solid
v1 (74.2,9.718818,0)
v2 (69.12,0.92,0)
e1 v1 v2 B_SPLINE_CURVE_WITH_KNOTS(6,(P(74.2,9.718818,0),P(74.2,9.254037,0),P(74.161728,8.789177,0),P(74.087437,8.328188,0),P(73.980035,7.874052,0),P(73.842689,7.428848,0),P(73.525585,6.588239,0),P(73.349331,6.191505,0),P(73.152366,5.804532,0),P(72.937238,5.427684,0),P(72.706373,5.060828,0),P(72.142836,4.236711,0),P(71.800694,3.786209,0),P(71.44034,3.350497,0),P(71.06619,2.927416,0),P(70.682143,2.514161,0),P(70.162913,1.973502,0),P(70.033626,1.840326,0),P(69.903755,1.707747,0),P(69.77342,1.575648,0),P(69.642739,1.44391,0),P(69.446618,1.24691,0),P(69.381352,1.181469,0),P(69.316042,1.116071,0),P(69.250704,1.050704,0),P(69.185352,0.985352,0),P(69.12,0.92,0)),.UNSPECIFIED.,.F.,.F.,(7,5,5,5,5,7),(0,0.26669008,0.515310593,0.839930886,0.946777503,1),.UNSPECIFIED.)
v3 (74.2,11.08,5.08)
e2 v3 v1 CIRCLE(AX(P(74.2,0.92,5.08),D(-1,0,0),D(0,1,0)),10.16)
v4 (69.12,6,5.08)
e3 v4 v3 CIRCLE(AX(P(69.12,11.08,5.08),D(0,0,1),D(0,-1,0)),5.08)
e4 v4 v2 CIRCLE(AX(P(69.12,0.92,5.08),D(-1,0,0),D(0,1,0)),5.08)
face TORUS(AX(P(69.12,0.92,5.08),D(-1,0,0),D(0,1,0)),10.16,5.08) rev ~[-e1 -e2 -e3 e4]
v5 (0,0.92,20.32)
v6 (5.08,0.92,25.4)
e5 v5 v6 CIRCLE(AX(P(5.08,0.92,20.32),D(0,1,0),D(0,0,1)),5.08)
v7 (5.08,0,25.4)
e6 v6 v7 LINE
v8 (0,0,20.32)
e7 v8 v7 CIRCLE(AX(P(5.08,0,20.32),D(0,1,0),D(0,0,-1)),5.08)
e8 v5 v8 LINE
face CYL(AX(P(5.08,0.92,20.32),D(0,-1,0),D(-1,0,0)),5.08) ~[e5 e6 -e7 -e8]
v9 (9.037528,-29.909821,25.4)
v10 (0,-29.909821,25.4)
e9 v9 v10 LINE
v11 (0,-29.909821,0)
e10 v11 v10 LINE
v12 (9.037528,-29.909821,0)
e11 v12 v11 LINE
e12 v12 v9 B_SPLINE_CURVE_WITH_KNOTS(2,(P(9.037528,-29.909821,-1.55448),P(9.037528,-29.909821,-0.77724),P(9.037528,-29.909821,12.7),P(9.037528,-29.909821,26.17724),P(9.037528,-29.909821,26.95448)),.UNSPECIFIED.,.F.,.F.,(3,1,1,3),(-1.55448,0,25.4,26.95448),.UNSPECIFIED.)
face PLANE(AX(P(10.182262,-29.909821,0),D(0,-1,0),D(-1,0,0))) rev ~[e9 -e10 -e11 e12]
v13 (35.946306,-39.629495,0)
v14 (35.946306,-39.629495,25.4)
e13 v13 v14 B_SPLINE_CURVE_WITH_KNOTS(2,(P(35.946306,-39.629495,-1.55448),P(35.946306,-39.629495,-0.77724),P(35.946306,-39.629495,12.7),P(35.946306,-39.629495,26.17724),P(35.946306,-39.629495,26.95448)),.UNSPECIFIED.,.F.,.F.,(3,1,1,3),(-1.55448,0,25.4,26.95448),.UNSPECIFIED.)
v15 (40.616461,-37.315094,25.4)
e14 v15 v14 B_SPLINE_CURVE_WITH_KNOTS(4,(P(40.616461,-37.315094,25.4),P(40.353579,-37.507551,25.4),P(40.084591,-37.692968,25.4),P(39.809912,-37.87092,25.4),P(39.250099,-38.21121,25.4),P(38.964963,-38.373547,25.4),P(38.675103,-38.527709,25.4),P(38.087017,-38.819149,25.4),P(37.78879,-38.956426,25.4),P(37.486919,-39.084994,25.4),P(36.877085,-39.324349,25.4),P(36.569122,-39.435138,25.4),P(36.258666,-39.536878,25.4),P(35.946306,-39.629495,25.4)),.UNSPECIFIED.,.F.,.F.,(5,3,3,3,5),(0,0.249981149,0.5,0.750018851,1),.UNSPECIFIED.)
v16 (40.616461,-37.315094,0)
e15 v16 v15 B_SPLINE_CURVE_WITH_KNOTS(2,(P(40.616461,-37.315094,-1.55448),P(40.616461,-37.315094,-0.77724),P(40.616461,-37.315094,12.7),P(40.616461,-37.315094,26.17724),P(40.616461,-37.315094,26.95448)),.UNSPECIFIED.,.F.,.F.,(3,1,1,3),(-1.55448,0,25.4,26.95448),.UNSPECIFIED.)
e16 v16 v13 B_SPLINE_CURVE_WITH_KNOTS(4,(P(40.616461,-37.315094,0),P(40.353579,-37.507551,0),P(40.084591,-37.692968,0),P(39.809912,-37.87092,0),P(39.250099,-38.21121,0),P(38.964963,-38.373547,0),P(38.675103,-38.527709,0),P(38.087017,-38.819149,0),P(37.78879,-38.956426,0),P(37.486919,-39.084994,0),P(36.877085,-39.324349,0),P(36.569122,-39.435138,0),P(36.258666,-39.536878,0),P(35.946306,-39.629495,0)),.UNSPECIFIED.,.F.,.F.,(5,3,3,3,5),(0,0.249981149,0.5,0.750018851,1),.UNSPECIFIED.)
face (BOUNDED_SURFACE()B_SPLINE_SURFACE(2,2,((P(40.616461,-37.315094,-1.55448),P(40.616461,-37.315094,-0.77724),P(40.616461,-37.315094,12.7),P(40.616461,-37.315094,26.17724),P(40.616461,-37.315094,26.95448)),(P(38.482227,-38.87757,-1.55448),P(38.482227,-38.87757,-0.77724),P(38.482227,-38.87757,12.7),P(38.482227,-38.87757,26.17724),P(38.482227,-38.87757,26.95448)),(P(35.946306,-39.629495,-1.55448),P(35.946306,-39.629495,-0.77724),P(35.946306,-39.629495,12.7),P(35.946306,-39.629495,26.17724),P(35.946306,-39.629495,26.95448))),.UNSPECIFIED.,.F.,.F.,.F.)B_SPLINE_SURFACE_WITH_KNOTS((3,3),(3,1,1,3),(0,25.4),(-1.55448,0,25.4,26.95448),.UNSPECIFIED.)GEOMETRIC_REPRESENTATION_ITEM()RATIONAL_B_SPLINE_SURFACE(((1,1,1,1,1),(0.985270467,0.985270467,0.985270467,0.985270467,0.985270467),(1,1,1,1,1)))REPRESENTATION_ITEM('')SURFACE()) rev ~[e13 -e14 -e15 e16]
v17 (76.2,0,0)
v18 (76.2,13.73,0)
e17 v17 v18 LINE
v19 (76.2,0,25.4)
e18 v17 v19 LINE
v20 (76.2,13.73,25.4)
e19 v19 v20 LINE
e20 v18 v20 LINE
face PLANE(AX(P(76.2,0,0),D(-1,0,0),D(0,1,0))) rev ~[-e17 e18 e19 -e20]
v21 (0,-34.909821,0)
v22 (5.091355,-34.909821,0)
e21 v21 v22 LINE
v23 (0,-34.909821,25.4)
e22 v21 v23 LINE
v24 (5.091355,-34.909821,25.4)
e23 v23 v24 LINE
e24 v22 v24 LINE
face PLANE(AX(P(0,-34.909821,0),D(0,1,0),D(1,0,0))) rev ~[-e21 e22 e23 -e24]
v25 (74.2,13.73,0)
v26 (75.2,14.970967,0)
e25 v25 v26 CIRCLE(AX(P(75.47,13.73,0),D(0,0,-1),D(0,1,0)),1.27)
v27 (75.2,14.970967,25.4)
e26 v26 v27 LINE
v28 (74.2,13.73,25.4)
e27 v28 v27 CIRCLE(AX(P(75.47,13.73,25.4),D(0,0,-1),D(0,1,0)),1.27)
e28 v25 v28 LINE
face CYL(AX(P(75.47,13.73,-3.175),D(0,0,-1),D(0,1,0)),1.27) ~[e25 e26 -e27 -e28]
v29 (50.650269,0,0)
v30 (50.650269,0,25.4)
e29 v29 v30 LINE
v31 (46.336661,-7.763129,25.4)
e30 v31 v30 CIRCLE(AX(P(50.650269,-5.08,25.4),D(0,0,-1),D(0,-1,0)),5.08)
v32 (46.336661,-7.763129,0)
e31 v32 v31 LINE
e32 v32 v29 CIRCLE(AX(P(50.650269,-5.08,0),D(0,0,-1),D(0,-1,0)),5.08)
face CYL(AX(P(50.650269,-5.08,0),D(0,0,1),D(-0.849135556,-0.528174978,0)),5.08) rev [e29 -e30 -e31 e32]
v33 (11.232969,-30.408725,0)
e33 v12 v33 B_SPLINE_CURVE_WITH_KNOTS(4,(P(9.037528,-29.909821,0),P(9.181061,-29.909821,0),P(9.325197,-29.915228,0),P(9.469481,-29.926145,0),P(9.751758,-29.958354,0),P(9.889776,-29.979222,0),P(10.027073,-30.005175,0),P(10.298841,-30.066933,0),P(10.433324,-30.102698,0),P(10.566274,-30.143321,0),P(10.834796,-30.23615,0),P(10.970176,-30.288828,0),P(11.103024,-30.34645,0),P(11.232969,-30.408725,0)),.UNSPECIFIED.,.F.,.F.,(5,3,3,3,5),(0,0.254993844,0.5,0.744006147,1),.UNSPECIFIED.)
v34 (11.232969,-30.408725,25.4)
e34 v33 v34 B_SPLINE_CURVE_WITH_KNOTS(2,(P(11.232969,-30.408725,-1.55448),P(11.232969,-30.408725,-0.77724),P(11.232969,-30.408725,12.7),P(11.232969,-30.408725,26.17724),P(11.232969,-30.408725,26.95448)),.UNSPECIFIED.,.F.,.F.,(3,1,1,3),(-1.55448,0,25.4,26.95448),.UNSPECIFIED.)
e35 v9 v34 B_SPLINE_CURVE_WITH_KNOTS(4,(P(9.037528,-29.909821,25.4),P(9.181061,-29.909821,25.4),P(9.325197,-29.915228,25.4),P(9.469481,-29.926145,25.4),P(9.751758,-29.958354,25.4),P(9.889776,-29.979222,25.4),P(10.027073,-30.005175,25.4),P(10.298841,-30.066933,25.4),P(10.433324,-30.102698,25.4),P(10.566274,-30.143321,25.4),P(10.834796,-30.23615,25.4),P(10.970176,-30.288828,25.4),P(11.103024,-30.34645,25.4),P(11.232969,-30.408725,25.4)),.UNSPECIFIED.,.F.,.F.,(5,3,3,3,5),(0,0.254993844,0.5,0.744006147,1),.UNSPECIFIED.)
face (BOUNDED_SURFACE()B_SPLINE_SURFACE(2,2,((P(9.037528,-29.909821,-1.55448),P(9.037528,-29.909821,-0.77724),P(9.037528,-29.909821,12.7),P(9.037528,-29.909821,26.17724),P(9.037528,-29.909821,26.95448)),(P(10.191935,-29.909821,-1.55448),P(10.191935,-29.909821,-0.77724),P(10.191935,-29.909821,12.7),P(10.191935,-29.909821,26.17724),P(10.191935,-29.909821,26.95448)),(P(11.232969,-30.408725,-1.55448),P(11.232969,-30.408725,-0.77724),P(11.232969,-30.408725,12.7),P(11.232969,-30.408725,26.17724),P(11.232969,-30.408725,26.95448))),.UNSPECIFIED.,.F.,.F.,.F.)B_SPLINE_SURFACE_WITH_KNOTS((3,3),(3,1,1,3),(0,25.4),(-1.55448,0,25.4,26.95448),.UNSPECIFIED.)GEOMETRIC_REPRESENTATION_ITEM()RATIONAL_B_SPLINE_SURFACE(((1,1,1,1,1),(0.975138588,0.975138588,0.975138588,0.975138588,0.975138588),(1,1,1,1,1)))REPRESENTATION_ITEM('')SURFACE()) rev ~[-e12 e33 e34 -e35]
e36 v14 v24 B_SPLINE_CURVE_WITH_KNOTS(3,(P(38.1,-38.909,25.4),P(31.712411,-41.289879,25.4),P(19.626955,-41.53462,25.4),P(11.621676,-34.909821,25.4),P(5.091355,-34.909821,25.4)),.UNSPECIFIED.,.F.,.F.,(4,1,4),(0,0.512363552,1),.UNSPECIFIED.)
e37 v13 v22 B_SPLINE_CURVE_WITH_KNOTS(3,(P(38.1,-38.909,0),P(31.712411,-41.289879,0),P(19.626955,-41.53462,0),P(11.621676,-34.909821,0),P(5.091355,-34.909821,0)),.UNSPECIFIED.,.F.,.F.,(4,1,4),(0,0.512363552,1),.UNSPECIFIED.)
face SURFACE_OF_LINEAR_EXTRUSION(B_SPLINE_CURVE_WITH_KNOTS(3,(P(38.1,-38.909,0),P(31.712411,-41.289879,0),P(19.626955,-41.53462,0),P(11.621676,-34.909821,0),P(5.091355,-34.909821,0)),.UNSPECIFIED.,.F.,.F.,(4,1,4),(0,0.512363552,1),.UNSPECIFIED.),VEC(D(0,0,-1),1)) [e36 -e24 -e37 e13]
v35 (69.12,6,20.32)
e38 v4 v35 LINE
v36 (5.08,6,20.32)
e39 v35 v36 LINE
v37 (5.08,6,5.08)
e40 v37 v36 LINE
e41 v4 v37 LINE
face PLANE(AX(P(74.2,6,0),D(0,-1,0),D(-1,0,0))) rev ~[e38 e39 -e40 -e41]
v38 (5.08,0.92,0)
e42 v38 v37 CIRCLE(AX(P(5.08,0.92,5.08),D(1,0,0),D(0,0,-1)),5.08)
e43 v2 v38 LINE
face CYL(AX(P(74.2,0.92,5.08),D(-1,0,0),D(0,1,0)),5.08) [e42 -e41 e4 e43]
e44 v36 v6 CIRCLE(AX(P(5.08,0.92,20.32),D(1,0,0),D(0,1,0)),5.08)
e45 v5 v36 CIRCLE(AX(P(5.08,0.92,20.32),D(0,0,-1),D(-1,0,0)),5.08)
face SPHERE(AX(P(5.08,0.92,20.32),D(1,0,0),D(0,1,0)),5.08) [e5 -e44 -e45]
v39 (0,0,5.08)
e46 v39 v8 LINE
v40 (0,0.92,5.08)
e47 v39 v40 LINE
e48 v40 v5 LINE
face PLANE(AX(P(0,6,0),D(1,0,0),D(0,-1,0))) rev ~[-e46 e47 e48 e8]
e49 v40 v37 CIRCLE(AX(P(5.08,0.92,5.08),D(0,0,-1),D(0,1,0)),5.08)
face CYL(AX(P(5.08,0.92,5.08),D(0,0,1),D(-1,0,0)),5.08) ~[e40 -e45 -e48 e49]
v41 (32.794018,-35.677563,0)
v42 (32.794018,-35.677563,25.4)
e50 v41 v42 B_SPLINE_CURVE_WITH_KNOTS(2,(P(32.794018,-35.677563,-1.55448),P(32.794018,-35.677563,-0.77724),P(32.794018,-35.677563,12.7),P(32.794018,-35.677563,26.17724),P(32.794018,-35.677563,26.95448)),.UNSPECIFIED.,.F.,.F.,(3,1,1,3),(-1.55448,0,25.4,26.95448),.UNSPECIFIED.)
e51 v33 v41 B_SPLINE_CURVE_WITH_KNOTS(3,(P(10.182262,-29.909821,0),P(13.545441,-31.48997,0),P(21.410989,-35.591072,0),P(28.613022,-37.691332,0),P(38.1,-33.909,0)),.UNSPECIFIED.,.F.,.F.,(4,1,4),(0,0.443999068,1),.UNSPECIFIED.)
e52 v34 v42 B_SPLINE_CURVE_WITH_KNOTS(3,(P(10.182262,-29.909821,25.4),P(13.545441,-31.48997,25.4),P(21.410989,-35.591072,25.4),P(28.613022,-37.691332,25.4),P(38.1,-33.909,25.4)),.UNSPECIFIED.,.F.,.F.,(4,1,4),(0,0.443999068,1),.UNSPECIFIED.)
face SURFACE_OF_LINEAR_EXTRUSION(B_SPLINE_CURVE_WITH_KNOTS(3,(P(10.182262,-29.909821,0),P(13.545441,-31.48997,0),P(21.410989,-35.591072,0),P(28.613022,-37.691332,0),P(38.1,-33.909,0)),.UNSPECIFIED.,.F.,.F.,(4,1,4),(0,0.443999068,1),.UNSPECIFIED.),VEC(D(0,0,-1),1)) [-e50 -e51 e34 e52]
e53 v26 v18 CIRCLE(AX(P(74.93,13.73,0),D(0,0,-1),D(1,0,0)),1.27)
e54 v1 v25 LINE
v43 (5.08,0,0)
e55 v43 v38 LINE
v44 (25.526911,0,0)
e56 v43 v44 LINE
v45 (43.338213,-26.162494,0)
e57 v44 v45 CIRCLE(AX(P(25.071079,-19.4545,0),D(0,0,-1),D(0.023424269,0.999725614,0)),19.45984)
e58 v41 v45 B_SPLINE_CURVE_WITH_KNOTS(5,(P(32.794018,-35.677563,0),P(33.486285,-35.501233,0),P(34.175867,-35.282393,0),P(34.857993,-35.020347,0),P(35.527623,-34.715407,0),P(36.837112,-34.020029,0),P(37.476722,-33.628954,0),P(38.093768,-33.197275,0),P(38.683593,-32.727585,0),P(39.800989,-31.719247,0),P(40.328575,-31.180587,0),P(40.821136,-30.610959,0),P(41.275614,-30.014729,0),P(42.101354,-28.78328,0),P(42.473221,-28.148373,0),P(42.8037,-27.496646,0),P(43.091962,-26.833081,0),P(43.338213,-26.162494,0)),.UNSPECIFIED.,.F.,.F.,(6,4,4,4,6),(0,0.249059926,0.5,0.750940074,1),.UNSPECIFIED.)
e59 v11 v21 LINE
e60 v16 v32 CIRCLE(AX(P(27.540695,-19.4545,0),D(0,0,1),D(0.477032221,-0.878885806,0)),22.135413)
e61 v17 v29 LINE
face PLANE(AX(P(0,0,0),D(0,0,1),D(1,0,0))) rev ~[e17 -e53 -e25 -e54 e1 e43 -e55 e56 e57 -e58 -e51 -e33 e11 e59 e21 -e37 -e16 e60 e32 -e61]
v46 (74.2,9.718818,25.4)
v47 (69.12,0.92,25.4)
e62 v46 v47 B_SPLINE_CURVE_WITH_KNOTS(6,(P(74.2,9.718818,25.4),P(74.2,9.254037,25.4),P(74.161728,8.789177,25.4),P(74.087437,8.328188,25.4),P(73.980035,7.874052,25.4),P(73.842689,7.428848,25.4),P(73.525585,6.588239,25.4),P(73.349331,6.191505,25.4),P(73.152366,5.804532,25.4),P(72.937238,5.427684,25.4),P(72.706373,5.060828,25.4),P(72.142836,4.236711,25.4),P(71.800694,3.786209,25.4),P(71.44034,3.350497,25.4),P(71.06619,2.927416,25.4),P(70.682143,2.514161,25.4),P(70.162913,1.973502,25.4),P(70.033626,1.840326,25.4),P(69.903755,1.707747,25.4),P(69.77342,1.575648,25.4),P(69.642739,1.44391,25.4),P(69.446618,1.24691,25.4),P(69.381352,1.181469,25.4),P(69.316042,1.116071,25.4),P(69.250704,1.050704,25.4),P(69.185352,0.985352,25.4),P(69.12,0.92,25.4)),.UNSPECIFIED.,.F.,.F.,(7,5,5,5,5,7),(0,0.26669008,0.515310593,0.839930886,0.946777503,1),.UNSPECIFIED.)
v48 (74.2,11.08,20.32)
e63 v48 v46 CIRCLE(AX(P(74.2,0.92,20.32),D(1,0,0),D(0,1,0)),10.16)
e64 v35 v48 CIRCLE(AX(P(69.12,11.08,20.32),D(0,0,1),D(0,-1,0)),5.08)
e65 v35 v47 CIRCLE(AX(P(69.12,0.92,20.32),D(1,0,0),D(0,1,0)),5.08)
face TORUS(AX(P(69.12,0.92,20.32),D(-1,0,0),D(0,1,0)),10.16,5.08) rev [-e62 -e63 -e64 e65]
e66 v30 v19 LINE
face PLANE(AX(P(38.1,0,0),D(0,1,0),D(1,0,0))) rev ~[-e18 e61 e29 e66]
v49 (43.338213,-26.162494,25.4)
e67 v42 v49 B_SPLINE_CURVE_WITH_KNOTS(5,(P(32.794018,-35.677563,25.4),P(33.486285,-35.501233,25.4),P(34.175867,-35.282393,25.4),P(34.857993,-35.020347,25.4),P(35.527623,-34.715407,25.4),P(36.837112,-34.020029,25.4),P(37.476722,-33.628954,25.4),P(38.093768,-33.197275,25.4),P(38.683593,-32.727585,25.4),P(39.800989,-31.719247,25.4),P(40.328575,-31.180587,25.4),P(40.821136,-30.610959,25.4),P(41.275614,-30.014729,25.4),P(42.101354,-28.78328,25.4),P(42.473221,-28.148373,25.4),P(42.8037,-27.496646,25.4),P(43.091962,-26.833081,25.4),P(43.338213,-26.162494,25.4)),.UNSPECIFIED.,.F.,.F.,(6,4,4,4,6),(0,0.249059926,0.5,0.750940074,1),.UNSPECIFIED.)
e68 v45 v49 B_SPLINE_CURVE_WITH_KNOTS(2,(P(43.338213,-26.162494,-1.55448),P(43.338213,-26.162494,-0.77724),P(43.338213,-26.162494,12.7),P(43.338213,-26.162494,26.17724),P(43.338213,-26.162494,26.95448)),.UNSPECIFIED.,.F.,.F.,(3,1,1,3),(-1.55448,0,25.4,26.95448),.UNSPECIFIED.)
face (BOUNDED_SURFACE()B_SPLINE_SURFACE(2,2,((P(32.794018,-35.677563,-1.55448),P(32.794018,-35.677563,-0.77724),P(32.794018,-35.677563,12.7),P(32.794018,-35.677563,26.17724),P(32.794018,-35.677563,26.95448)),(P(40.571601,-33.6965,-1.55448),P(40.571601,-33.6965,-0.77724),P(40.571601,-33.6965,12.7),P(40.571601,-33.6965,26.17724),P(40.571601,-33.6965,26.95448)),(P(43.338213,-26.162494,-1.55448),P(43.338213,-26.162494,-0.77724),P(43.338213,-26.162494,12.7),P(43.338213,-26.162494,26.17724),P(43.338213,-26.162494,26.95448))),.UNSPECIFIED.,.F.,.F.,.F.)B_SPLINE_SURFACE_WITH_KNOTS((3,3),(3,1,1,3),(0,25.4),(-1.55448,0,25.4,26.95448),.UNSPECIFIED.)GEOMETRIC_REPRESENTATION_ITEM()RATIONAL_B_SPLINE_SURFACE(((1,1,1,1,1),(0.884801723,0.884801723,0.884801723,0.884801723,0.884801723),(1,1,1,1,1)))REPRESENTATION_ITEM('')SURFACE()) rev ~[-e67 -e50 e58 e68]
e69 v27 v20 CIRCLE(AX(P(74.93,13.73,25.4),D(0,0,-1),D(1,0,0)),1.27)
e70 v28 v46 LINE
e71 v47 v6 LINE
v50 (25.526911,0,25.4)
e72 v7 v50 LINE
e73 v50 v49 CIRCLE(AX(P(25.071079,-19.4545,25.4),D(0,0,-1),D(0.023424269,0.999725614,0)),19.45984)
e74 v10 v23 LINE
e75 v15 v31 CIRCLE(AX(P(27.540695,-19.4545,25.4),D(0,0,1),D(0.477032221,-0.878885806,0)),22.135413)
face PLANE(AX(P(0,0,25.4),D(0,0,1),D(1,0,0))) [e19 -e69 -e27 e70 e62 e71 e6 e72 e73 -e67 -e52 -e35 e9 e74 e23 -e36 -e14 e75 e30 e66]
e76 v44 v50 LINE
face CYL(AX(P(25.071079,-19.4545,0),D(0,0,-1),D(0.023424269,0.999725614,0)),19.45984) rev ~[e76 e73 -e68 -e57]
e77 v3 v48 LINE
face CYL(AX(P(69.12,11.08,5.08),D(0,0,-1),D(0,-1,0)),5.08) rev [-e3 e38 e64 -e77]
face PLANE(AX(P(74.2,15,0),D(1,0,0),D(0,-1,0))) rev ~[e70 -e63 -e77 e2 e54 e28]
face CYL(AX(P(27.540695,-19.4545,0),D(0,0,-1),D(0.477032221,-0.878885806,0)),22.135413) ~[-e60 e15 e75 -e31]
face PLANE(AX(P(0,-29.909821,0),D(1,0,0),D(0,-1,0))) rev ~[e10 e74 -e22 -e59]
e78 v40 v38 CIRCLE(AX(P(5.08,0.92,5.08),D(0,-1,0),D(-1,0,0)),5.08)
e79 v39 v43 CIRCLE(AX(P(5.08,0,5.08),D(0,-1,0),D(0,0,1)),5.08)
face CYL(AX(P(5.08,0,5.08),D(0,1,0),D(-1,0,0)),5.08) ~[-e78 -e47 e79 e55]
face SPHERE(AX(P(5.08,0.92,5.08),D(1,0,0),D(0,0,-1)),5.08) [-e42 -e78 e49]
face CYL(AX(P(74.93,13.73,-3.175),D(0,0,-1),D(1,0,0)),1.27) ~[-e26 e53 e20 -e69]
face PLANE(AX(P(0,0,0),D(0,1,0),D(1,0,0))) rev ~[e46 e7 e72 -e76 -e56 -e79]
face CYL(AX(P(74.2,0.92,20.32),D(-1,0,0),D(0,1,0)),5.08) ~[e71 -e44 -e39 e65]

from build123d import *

# Parameters (mm, degrees)
F1_DEPTH     = 25.4
F2_R         = 5.08
F3_T1_DEPTH  = 15.24
F3_T6_ANGLE  = 233.2969892374
F3_T12_ANGLE = 233.2969892374
F4_T1_DEPTH  = 31.75
F5_R         = 15.24
F6_R         = 5.08
F7_R         = 5.08
F8_R         = 5.08


# Not quite as in the source:
# - a fillet or chamfer that OpenCascade refuses, or shapes differently, is made with other operations: its cross-section is extruded or revolved along the edge and cut away or added


with BuildPart() as f1:
    # F0 (on Top) → F1 (new body)
    with BuildSketch(Plane.XY):
        Polygon((0, 6), (0, 0), (25.5269114748, 0), (38.1, 0), (76.2, 0), (76.2, 15), (74.2, 15), (74.2, 6), align=None)
        with BuildLine():
            Line((38.1, 0), (25.5269114748, 0))
            ThreePointArc((25.5269114748, 0), (43.3170296074, -12.6890998813), (38.1, -33.909))
            add(Edge.make_bspline(
                [(10.1822623983, -29.9098208), (13.5454405981, -31.48996992), (21.4109886211, -35.5910719416), (28.6130215973, -37.6913323998), (38.1, -33.909)],
                knots=[0, 0, 0, 0, 0.4439990675, 1, 1, 1, 1], degree=3))
            Line((10.1822623983, -29.9098208), (0, -29.9098208))
            Line((0, -29.9098208), (0, -34.9098208))
            Line((0, -34.9098208), (5.0913545239, -34.9098208))
            add(Edge.make_bspline(
                [(38.1, -38.909), (31.7124112149, -41.2898788749), (19.626955474, -41.5346198852), (11.6216761715, -34.9098208), (5.0913545239, -34.9098208)],
                knots=[0, 0, 0, 0, 0.512363552, 1, 1, 1, 1], degree=3))
            ThreePointArc((38.1, -38.909), (49.6761075901, -19.4545), (38.1, 0))
        make_face()
    extrude(amount=F1_DEPTH)

    # F2
    f2_edges = [f1.edges().sort_by_distance(p)[0] for p in [
        (37.1, 6, 25.4),
        (37.1, 6, 0),
    ]]
    fillet(f2_edges, radius=F2_R)

    # F3: fillet of radius 5.08 on 1 edges, made by hand

    # F3_s2 → F3_t1 (join)
    with BuildSketch(Plane.XY.offset(5.08)):
        with BuildLine():
            ThreePointArc((69.12, 6), (72.7121024484, 7.4878975516), (74.2, 11.08))
            Line((74.2, 11.08), (74.2, 6))
            Line((74.2, 6), (69.12, 6))
        make_face()
    extrude(amount=F3_T1_DEPTH)


with BuildPart() as f3_tool4:
    # F3_s5 → F3_t6 (revolve)
    with BuildSketch(Plane.XY.offset(5.08)):
        with BuildLine():
            ThreePointArc((69.12, 6), (72.7121024484, 7.4878975516), (74.2, 11.08))
            Line((74.2, 11.08), (74.2, 6))
            Line((74.2, 6), (69.12, 6))
        make_face()
    revolve(axis=Axis((74.2, 0.92, 5.08), (-1, 0, 0)), revolution_arc=F3_T6_ANGLE)

    split(bisect_by=Plane.XY, keep=Keep.TOP)

    split(bisect_by=Plane.XZ, keep=Keep.BOTTOM)


with BuildPart() as f1_1:
    add(f1.part)

    # F3_t3: union F3_tool4
    add(f3_tool4.part)


with BuildPart() as f3_tool10:
    # F3_s11 → F3_t12 (revolve)
    with BuildSketch(Plane.XY.offset(20.32)):
        with BuildLine():
            ThreePointArc((69.12, 6), (72.7121024484, 7.4878975516), (74.2, 11.08))
            Line((74.2, 11.08), (74.2, 6))
            Line((74.2, 6), (69.12, 6))
        make_face()
    revolve(axis=Axis((74.2, 0.92, 20.32), (1, 0, 0)), revolution_arc=F3_T12_ANGLE)

    split(bisect_by=Plane.XY.offset(25.4), keep=Keep.BOTTOM)

    split(bisect_by=Plane.XZ, keep=Keep.BOTTOM)


with BuildPart() as f1_2:
    add(f1_1.part)

    # F3_t9: union F3_tool10
    add(f3_tool10.part)

    # F4: fillet of radius 1.27 on 2 edges, made by hand

    # F4_s2 → F4_t1 (cut)
    with BuildSketch(Plane.XY.offset(-3.175)):
        with BuildLine():
            ThreePointArc((75.47, 15), (74.5719743879, 14.6280256121), (74.2, 13.73))
            Line((74.2, 13.73), (74.2, 15))
            Line((74.2, 15), (75.47, 15))
        make_face()
        with BuildLine():
            ThreePointArc((76.2, 13.73), (75.8280256121, 14.6280256121), (74.93, 15))
            Line((74.93, 15), (76.2, 15))
            Line((76.2, 15), (76.2, 13.73))
        make_face()
    extrude(amount=F4_T1_DEPTH, mode=Mode.SUBTRACT)

    # F5
    f5_edges = [f1_2.edges().sort_by_distance(p)[0] for p in [
        (38.1, -38.909, 12.7),
        (38.1, -33.909, 12.7),
    ]]
    fillet(f5_edges, radius=F5_R)

    # F6
    f6_edges = [f1_2.edges().sort_by_distance(p)[0] for p in [
        (38.1, 0, 12.7),
    ]]
    fillet(f6_edges, radius=F6_R)

    # F7
    f7_edges = [f1_2.edges().sort_by_distance(p)[0] for p in [
        (10.182262, -29.909821, 12.7),
    ]]
    fillet(f7_edges, radius=F7_R)

    # F8
    f8_edges = [f1_2.edges().sort_by_distance(p)[0] for p in [
        (0, 6, 12.7),
        (0, 0.46, 0),
        (0, 4.512102, 1.487898),
        (0, 4.512102, 23.912102),
        (0, 0.46, 25.4),
    ]]
    fillet(f8_edges, radius=F8_R)


solid = f1_2.part
